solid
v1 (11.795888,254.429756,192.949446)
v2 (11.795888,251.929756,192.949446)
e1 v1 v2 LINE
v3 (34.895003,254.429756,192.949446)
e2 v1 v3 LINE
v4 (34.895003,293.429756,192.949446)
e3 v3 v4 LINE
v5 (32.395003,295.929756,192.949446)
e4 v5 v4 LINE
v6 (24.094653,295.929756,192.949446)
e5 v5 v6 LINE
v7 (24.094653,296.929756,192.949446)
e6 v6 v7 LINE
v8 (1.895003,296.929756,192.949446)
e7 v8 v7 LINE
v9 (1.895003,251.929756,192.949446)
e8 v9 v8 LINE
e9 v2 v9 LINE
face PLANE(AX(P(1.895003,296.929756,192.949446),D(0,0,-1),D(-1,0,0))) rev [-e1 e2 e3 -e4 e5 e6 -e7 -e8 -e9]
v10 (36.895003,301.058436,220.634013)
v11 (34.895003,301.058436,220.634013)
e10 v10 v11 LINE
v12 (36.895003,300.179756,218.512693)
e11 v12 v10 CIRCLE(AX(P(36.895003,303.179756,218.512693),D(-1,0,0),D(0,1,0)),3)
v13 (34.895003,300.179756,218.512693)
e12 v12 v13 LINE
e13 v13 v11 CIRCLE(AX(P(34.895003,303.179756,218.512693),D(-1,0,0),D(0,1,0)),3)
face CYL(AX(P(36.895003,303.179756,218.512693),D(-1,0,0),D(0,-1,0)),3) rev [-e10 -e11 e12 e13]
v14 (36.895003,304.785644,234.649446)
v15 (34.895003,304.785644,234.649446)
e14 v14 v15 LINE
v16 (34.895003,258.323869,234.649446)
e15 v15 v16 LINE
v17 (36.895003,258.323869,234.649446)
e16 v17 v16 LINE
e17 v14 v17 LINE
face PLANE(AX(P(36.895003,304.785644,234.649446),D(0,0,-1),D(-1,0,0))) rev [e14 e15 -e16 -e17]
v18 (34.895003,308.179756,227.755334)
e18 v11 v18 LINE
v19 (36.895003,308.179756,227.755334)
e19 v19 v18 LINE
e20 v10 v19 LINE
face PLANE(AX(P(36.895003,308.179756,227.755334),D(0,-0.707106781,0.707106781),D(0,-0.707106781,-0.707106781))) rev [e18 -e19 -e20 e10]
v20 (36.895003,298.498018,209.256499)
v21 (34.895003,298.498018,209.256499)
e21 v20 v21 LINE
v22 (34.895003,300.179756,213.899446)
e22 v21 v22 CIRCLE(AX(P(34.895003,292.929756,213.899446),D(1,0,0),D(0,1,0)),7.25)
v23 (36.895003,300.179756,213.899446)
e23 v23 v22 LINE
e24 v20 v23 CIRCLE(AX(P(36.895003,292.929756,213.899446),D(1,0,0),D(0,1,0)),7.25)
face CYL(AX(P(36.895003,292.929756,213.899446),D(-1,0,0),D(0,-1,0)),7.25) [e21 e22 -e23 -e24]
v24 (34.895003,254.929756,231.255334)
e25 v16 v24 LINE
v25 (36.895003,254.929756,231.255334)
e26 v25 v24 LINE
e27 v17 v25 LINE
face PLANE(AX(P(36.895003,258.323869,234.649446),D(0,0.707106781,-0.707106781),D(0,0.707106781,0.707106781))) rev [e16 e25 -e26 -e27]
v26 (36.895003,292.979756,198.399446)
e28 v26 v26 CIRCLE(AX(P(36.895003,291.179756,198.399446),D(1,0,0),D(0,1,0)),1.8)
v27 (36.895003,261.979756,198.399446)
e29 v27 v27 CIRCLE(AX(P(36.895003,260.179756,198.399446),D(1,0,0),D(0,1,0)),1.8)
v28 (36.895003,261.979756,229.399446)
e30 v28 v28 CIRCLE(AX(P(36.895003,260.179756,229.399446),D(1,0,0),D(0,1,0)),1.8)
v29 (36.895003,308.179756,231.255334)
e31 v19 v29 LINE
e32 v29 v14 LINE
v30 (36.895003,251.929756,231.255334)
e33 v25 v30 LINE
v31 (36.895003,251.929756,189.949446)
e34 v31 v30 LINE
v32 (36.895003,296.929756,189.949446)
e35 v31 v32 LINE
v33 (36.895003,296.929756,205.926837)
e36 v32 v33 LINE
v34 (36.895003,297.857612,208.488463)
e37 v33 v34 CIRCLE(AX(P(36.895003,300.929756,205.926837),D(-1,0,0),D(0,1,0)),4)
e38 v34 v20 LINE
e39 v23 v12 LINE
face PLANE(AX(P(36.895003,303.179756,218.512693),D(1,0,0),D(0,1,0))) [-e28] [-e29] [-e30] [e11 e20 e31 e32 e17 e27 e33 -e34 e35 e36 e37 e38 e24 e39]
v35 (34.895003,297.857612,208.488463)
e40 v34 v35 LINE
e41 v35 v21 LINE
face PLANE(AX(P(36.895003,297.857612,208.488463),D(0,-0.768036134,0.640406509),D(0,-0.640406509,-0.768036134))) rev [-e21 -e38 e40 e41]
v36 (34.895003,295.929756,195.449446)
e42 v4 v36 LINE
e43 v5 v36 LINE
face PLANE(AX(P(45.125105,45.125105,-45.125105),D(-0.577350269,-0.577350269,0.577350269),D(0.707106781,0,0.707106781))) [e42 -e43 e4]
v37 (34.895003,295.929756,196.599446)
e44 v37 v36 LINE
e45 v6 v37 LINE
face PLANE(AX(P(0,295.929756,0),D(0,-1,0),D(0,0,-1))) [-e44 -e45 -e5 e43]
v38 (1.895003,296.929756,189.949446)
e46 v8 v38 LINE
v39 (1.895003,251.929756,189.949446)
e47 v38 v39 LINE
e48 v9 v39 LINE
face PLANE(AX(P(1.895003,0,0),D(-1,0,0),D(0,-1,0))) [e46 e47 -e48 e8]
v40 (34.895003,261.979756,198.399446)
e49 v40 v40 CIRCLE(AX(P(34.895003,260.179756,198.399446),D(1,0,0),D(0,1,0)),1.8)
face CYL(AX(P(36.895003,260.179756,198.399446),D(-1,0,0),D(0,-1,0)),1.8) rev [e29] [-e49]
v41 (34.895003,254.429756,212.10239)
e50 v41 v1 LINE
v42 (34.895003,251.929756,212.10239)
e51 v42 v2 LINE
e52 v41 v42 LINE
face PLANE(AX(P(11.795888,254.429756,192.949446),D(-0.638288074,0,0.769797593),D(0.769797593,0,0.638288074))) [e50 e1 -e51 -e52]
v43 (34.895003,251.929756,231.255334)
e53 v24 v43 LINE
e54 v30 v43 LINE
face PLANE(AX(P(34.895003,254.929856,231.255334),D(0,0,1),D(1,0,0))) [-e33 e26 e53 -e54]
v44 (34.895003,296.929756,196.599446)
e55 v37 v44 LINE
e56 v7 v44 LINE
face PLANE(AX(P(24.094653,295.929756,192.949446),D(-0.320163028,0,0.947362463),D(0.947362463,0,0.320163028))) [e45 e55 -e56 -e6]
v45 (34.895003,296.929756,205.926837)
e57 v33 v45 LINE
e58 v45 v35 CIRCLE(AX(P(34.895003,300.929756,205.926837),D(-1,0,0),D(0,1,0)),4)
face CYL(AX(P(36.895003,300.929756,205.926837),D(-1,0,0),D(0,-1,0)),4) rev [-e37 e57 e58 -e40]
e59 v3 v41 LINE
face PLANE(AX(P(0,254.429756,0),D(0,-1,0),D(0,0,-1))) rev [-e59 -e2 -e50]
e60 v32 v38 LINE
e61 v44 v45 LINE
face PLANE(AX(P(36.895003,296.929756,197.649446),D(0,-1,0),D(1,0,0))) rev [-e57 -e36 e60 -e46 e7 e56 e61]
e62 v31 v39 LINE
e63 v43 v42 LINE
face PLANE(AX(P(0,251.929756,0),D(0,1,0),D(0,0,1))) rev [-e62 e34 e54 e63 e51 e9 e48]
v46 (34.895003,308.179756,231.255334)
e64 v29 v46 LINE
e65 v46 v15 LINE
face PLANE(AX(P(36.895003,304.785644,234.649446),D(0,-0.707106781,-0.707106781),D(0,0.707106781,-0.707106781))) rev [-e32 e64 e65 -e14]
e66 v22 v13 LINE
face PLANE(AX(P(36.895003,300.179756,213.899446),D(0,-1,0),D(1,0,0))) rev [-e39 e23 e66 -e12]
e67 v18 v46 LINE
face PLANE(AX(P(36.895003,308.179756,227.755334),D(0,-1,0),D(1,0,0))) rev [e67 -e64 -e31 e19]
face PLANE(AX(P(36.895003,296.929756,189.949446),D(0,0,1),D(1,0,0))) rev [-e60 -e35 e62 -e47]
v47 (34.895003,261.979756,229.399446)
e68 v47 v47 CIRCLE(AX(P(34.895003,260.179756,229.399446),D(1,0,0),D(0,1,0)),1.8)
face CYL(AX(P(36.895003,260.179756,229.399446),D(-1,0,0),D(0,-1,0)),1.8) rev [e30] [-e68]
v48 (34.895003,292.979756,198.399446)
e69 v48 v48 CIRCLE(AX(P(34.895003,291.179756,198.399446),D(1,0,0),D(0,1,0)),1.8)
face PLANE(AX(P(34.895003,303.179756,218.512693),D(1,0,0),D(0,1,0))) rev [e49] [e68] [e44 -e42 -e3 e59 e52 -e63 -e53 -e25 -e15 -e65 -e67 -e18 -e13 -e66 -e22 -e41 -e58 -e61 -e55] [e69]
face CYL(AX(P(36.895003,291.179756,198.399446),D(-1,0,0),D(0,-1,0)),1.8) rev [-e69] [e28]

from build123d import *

# Parameters (mm, degrees)
SKETCH1_R                = 1.8
BOSS_EXTRUDE1_DEPTH      = 2
BOSS_EXTRUDE2_DEPTH      = 33
BOSS_EXTRUDE3_DEPTH      = 1
CHAMFER1_START           = 78.15897378
CHAMFER1_DEPTH           = 1.443375673
BOSS_EXTRUDE4_DEPTH      = 3
BOSS_EXTRUDE4_DEPTH_BACK = 0.0001
BOSS_EXTRUDE5_DEPTH      = 2.5
CUT_EXTRUDE1_DEPTH       = 3.0001


with BuildPart() as part:
    # Sketch1 → Boss-Extrude1 (new body)
    with BuildSketch(Plane(origin=(34.895003496, 0, 0), x_dir=(0, 0, -1), z_dir=(1, 0, 0))):
        with BuildLine():
            Line((-197.649446246, 296.929756404), (-189.949446246, 296.929756404))
            Line((-189.949446246, 296.929756404), (-189.949446246, 254.929756404))
            Line((-189.949446246, 254.929756404), (-196.543558796, 254.929756404))
            Line((-196.543558796, 254.929756404), (-231.255333696, 254.929756404))
            Line((-231.255333696, 254.929756404), (-234.649446246, 258.323868954))
            Line((-234.649446246, 258.323868954), (-234.649446246, 304.785643855))
            Line((-234.649446246, 304.785643855), (-231.255333696, 308.179756404))
            Line((-231.255333696, 308.179756404), (-227.755333696, 308.179756404))
            Line((-227.755333696, 308.179756404), (-224.361221147, 304.785643855))
            Line((-224.361221147, 304.785643855), (-220.634013353, 301.058436061))
            ThreePointArc((-220.634013353, 301.058436061), (-219.660743306, 300.408117807), (-218.512693009, 300.179756404))
            Line((-218.512693009, 300.179756404), (-213.899446246, 300.179756404))
            ThreePointArc((-213.899446246, 300.179756404), (-211.430377525, 299.74636844), (-209.256499056, 298.498018377))
            Line((-209.256499056, 298.498018377), (-208.488462922, 297.857611868))
            ThreePointArc((-208.488462922, 297.857611868), (-207.289081698, 297.168867005), (-205.926836886, 296.929756404))
            Line((-205.926836886, 296.929756404), (-197.649446246, 296.929756404))
        make_face()
        with Locations(Location((-198.399446246, 291.179756404, 0), (0, 0, 90))):
            Circle(SKETCH1_R, mode=Mode.SUBTRACT)
        with Locations(Location((-198.399446246, 260.179756404, 0), (0, 0, 90))):
            Circle(SKETCH1_R, mode=Mode.SUBTRACT)
        with Locations(Location((-229.399446246, 260.179756404, 0), (0, 0, 90))):
            Circle(SKETCH1_R, mode=Mode.SUBTRACT)
    extrude(amount=BOSS_EXTRUDE1_DEPTH)

    # Sketch2 → Boss-Extrude2 (add)
    with BuildSketch(Plane.ZY.offset(-34.895003496)):
        Polygon((192.949446246, 296.929756404), (192.949446246, 255.737509851), (192.949446246, 254.929756404), (189.949446246, 254.929756404), (189.949446246, 296.929756404), align=None)
    extrude(amount=BOSS_EXTRUDE2_DEPTH)

    # Sketch3 → Boss-Extrude3 (add)
    with BuildSketch(Plane(origin=(0, 296.929756404, 0), x_dir=(1, 0, 0), z_dir=(0, 1, 0))):
        Polygon((24.09465277, -192.949446246), (34.895003496, -196.599446246), (34.895003496, -192.949446246), align=None)
    extrude(amount=-BOSS_EXTRUDE3_DEPTH)

    # Chamfer1: read off the stored shape, not the designer's step
    # Chamfer1 outline → Chamfer1 (add)
    with BuildSketch(Plane(origin=(0, 0, 0), x_dir=(0.8164965809277265, -0.4082482904638619, 0.4082482904638633), z_dir=(0.5773502691896251, 0.5773502691896252, -0.5773502691896272)).offset(CHAMFER1_START)):
        Polygon((-15.59112598, -345.689799375), (-12.529263801, -347.457566328), (-12.529263801, -343.922032422), align=None)
    extrude(amount=CHAMFER1_DEPTH)

    # Sketch4 → Boss-Extrude4 (add, two sides: drawn at the far end of the back side and taken through both)
    with BuildSketch(Plane.XZ.offset(-254.929756404).offset(-BOSS_EXTRUDE4_DEPTH_BACK)):
        Polygon((1.895003496, 192.949446246), (34.895003496, 192.949446246), (34.895003496, 231.255333696), (36.895003496, 231.255333696), (36.895003496, 189.949446246), (1.895003496, 170.0501531), align=None)
    extrude(amount=BOSS_EXTRUDE4_DEPTH + BOSS_EXTRUDE4_DEPTH_BACK)

    # Sketch5 → Boss-Extrude5 (add)
    with BuildSketch(Plane.XZ.offset(-251.929756404)):
        Polygon((11.795887964, 192.949446246), (34.895003496, 212.102389971), (34.895003496, 192.949446246), align=None)
    extrude(amount=-BOSS_EXTRUDE5_DEPTH)

    # Sketch6 → Cut-Extrude1 (cut)
    with BuildSketch(Plane(origin=(0, 254.929856404, 0), x_dir=(1, 0, 0), z_dir=(0, 1, 0))):
        Polygon((1.895003496, -189.949446246), (36.895003496, -189.949446246), (1.895003496, -170.0501531), align=None)
    extrude(amount=-CUT_EXTRUDE1_DEPTH, mode=Mode.SUBTRACT)


solid = part.part
